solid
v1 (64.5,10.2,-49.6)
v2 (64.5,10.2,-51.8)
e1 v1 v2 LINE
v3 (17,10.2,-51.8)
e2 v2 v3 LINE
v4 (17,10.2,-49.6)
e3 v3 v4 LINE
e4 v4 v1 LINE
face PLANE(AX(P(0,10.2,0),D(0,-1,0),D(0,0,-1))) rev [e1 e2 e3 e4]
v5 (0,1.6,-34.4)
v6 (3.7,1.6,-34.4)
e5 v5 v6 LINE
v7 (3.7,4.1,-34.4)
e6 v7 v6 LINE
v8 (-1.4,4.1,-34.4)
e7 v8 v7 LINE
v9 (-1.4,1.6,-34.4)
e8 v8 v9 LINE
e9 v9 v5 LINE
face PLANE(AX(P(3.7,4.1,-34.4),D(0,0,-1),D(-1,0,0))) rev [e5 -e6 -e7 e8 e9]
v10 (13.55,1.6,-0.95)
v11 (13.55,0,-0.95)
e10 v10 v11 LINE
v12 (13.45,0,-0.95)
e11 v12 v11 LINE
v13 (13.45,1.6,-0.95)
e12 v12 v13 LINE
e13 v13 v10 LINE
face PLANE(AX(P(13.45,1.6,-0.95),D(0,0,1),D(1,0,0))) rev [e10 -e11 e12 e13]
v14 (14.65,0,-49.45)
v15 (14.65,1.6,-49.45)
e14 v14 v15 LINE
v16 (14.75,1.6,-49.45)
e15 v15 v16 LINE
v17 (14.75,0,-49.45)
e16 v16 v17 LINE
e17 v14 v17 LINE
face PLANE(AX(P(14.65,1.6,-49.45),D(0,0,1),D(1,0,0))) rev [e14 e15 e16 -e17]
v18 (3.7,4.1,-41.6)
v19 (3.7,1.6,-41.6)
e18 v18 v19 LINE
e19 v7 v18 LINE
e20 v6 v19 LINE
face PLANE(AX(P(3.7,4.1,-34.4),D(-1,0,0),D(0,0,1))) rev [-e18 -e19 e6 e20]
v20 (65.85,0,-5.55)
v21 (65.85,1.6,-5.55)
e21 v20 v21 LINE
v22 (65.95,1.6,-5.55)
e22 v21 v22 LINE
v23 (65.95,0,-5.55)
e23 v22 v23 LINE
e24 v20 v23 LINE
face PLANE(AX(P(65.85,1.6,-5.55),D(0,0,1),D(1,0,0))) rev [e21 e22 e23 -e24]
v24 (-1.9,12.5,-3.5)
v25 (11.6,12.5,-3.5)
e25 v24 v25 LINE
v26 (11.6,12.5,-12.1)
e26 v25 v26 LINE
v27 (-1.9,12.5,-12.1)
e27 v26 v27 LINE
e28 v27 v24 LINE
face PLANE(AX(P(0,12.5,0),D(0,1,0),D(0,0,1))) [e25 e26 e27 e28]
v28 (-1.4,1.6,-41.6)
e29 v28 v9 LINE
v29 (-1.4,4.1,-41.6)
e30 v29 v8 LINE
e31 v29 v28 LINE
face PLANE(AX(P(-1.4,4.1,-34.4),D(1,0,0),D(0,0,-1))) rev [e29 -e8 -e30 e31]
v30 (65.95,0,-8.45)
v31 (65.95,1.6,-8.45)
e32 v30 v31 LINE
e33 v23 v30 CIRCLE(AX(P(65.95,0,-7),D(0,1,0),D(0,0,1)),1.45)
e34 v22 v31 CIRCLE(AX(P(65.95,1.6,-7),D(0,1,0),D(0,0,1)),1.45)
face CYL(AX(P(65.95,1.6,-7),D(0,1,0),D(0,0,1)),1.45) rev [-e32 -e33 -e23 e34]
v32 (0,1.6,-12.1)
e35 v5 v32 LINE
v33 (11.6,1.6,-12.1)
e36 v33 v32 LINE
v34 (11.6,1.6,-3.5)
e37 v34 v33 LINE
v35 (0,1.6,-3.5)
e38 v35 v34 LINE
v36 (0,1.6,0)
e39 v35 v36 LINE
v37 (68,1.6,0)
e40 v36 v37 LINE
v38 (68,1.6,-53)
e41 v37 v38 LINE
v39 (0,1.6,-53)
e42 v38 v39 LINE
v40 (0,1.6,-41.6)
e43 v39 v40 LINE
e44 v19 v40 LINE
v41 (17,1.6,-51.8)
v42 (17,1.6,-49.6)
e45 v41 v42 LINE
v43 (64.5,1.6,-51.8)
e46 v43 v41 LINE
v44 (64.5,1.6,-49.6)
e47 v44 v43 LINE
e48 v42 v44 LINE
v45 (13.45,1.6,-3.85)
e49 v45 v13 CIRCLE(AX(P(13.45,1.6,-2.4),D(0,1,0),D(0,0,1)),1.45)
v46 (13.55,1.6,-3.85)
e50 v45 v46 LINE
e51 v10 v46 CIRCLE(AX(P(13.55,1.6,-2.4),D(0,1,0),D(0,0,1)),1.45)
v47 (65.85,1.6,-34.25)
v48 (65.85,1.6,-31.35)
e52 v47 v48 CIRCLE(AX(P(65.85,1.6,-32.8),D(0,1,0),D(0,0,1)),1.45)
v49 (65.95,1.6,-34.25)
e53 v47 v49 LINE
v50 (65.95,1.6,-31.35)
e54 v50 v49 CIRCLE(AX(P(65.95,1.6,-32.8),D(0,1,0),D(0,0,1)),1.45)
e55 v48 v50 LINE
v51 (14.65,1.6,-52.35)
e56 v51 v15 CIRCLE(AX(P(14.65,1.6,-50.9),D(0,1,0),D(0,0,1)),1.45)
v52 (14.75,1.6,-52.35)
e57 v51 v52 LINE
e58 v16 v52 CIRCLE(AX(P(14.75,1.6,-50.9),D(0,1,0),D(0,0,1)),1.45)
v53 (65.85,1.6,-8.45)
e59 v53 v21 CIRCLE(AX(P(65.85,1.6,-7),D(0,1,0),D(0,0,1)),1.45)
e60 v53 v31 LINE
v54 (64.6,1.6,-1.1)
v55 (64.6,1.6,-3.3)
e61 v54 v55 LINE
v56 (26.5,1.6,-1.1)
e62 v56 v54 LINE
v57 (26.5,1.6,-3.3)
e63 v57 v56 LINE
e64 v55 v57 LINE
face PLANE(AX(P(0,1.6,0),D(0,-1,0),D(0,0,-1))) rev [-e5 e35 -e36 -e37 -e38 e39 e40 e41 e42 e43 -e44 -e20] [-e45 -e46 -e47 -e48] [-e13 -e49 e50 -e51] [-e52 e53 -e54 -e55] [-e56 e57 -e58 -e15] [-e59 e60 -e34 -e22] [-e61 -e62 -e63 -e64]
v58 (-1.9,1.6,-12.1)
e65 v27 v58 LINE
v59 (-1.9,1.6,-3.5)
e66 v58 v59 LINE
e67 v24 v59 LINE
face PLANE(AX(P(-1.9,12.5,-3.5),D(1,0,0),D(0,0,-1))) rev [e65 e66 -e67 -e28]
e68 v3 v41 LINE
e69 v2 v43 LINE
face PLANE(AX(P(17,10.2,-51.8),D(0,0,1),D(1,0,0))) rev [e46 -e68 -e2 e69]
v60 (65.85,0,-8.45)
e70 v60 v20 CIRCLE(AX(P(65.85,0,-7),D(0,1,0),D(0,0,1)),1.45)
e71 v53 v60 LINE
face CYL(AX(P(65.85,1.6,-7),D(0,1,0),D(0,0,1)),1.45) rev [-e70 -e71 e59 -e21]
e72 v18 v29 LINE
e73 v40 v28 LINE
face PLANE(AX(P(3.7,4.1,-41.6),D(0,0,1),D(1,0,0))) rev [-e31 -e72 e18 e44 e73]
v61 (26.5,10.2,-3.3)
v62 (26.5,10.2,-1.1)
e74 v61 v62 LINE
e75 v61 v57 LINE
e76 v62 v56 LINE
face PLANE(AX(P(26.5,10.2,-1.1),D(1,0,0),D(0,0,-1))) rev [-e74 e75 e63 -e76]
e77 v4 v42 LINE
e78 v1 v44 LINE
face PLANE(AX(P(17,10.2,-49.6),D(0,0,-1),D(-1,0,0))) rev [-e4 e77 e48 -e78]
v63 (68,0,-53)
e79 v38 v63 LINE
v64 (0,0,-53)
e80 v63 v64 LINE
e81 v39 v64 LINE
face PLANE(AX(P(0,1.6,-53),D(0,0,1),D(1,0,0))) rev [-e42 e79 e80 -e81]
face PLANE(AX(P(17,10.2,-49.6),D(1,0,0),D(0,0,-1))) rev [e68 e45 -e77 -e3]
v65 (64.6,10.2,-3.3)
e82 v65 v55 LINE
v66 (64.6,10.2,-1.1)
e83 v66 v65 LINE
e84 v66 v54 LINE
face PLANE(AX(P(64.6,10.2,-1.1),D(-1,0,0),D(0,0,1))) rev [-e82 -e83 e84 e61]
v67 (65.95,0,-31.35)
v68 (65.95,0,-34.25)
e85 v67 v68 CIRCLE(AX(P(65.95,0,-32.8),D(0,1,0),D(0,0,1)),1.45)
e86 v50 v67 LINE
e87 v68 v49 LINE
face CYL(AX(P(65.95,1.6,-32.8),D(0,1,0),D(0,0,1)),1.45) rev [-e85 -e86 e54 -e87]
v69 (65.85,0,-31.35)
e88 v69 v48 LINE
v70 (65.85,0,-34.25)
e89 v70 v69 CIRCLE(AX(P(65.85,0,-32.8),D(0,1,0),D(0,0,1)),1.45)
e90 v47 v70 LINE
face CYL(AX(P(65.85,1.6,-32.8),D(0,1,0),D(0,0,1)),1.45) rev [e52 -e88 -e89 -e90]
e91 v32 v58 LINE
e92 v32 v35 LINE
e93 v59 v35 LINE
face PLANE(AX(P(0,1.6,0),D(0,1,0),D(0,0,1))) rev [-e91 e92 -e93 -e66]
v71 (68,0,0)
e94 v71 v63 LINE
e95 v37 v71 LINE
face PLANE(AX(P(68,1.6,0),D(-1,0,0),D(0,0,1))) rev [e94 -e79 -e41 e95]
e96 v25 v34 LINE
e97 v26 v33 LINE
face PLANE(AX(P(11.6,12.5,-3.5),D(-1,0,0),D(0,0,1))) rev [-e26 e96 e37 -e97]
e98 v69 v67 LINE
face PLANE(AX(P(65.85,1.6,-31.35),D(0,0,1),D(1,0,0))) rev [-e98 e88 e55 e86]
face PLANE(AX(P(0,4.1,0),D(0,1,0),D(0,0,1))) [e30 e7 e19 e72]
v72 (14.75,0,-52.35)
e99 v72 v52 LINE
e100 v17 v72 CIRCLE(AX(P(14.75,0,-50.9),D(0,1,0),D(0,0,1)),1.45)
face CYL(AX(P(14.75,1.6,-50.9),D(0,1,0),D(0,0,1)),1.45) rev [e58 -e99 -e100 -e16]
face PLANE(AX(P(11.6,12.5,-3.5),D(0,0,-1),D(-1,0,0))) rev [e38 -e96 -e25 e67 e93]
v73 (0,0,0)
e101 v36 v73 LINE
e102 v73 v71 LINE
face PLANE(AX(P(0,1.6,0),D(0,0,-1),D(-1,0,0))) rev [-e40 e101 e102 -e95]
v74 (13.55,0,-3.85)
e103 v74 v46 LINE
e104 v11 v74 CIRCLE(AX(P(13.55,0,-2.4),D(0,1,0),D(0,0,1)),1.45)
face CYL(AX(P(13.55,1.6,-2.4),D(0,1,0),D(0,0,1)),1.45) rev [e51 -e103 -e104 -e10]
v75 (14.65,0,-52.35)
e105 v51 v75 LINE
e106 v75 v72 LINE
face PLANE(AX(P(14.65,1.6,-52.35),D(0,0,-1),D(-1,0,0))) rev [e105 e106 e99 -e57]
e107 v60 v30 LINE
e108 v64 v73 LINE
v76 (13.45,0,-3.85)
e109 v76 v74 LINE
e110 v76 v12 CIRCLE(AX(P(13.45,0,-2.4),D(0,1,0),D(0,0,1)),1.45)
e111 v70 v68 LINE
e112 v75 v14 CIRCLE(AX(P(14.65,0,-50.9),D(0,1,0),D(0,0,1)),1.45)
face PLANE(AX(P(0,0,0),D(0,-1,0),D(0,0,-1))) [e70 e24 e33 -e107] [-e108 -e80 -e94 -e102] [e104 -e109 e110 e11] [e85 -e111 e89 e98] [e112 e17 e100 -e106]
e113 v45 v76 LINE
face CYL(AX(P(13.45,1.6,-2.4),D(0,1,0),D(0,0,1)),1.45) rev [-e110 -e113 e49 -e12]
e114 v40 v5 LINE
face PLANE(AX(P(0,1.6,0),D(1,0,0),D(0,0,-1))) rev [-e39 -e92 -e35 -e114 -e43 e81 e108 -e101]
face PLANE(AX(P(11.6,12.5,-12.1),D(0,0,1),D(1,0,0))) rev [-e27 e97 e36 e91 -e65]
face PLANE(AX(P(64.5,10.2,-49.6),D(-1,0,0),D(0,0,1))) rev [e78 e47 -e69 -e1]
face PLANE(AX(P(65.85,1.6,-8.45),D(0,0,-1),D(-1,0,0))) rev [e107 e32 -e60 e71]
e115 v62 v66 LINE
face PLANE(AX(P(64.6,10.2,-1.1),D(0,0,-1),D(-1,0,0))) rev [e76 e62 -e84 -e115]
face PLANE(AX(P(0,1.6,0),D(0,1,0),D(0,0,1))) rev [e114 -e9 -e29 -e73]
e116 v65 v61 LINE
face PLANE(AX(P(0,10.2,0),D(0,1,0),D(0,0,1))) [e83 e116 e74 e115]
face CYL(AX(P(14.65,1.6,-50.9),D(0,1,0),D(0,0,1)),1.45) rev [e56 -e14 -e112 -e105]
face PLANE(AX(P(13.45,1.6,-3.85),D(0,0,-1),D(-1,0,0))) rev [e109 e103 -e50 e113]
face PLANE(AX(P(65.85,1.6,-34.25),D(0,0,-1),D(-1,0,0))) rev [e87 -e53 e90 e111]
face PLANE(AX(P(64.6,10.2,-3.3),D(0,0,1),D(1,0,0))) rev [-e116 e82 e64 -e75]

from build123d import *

# Parameters (mm, degrees)
SKETCH1_W                  = 68
SKETCH1_H                  = 53
BOSS_EXTRUDE1_DEPTH        = 1.6
M2_5_CLEARANCE_SLOT1_DEPTH = 1.6
SKETCH4_W                  = 47.5
SKETCH4_H                  = 2.2
SKETCH4_W_2                = 38.1
BOSS_EXTRUDE2_DEPTH        = 8.6
SKETCH5_W                  = 13.5
SKETCH5_H                  = 8.6
BOSS_EXTRUDE3_DEPTH        = 10.9
SKETCH6_W                  = 5.1
SKETCH6_H                  = 7.2
BOSS_EXTRUDE4_DEPTH        = 2.5


# Read off the part's stored shape, not the designer's step: M2.5 Clearance Slot1
with BuildPart() as part:
    # Sketch1 → Boss-Extrude1 (new body)
    with BuildSketch(Plane(origin=(0, 0, 0), x_dir=(1, 0, 0), z_dir=(0, 1, 0))):
        with Locations((34, 26.5)):
            Rectangle(SKETCH1_W, SKETCH1_H)
    extrude(amount=BOSS_EXTRUDE1_DEPTH)

    # M2.5 Clearance Slot1 outline → M2.5 Clearance Slot1 (cut)
    with BuildSketch(Plane(origin=(0, 0, 0), x_dir=(1, 0, 0), z_dir=(0, 1, 0))):
        with BuildLine():
            Line((14.65, 49.45), (14.75, 49.45))
            ThreePointArc((14.75, 49.45), (16.2, 50.9), (14.75, 52.35))
            Line((14.75, 52.35), (14.65, 52.35))
            ThreePointArc((14.65, 52.35), (13.2, 50.9), (14.65, 49.45))
        make_face()
        with BuildLine():
            Line((65.85, 31.35), (65.95, 31.35))
            ThreePointArc((65.95, 31.35), (67.4, 32.8), (65.95, 34.25))
            Line((65.95, 34.25), (65.85, 34.25))
            ThreePointArc((65.85, 34.25), (64.4, 32.8), (65.85, 31.35))
        make_face()
        with BuildLine():
            Line((65.85, 5.55), (65.95, 5.55))
            ThreePointArc((65.95, 5.55), (67.4, 7), (65.95, 8.45))
            Line((65.95, 8.45), (65.85, 8.45))
            ThreePointArc((65.85, 8.45), (64.4, 7), (65.85, 5.55))
        make_face()
        with BuildLine():
            Line((13.45, 0.95), (13.55, 0.95))
            ThreePointArc((13.55, 0.95), (15, 2.4), (13.55, 3.85))
            Line((13.55, 3.85), (13.45, 3.85))
            ThreePointArc((13.45, 3.85), (12, 2.4), (13.45, 0.95))
        make_face()
    extrude(amount=M2_5_CLEARANCE_SLOT1_DEPTH, mode=Mode.SUBTRACT)

    # Sketch4 → Boss-Extrude2 (add)
    with BuildSketch(Plane(origin=(0, 1.6, 0), x_dir=(1, 0, 0), z_dir=(0, 1, 0))):
        with Locations((40.75, 50.7)):
            Rectangle(SKETCH4_W, SKETCH4_H)
        with Locations((45.55, 2.2)):
            Rectangle(SKETCH4_W_2, SKETCH4_H)
    extrude(amount=BOSS_EXTRUDE2_DEPTH)

    # Sketch5 → Boss-Extrude3 (add)
    with BuildSketch(Plane(origin=(0, 1.6, 0), x_dir=(1, 0, 0), z_dir=(0, 1, 0))):
        with Locations((4.85, 7.8)):
            Rectangle(SKETCH5_W, SKETCH5_H)
    extrude(amount=BOSS_EXTRUDE3_DEPTH)

    # Sketch6 → Boss-Extrude4 (add)
    with BuildSketch(Plane(origin=(0, 1.6, 0), x_dir=(1, 0, 0), z_dir=(0, 1, 0))):
        with Locations((1.15, 38)):
            Rectangle(SKETCH6_W, SKETCH6_H)
    extrude(amount=BOSS_EXTRUDE4_DEPTH)


solid = part.part
